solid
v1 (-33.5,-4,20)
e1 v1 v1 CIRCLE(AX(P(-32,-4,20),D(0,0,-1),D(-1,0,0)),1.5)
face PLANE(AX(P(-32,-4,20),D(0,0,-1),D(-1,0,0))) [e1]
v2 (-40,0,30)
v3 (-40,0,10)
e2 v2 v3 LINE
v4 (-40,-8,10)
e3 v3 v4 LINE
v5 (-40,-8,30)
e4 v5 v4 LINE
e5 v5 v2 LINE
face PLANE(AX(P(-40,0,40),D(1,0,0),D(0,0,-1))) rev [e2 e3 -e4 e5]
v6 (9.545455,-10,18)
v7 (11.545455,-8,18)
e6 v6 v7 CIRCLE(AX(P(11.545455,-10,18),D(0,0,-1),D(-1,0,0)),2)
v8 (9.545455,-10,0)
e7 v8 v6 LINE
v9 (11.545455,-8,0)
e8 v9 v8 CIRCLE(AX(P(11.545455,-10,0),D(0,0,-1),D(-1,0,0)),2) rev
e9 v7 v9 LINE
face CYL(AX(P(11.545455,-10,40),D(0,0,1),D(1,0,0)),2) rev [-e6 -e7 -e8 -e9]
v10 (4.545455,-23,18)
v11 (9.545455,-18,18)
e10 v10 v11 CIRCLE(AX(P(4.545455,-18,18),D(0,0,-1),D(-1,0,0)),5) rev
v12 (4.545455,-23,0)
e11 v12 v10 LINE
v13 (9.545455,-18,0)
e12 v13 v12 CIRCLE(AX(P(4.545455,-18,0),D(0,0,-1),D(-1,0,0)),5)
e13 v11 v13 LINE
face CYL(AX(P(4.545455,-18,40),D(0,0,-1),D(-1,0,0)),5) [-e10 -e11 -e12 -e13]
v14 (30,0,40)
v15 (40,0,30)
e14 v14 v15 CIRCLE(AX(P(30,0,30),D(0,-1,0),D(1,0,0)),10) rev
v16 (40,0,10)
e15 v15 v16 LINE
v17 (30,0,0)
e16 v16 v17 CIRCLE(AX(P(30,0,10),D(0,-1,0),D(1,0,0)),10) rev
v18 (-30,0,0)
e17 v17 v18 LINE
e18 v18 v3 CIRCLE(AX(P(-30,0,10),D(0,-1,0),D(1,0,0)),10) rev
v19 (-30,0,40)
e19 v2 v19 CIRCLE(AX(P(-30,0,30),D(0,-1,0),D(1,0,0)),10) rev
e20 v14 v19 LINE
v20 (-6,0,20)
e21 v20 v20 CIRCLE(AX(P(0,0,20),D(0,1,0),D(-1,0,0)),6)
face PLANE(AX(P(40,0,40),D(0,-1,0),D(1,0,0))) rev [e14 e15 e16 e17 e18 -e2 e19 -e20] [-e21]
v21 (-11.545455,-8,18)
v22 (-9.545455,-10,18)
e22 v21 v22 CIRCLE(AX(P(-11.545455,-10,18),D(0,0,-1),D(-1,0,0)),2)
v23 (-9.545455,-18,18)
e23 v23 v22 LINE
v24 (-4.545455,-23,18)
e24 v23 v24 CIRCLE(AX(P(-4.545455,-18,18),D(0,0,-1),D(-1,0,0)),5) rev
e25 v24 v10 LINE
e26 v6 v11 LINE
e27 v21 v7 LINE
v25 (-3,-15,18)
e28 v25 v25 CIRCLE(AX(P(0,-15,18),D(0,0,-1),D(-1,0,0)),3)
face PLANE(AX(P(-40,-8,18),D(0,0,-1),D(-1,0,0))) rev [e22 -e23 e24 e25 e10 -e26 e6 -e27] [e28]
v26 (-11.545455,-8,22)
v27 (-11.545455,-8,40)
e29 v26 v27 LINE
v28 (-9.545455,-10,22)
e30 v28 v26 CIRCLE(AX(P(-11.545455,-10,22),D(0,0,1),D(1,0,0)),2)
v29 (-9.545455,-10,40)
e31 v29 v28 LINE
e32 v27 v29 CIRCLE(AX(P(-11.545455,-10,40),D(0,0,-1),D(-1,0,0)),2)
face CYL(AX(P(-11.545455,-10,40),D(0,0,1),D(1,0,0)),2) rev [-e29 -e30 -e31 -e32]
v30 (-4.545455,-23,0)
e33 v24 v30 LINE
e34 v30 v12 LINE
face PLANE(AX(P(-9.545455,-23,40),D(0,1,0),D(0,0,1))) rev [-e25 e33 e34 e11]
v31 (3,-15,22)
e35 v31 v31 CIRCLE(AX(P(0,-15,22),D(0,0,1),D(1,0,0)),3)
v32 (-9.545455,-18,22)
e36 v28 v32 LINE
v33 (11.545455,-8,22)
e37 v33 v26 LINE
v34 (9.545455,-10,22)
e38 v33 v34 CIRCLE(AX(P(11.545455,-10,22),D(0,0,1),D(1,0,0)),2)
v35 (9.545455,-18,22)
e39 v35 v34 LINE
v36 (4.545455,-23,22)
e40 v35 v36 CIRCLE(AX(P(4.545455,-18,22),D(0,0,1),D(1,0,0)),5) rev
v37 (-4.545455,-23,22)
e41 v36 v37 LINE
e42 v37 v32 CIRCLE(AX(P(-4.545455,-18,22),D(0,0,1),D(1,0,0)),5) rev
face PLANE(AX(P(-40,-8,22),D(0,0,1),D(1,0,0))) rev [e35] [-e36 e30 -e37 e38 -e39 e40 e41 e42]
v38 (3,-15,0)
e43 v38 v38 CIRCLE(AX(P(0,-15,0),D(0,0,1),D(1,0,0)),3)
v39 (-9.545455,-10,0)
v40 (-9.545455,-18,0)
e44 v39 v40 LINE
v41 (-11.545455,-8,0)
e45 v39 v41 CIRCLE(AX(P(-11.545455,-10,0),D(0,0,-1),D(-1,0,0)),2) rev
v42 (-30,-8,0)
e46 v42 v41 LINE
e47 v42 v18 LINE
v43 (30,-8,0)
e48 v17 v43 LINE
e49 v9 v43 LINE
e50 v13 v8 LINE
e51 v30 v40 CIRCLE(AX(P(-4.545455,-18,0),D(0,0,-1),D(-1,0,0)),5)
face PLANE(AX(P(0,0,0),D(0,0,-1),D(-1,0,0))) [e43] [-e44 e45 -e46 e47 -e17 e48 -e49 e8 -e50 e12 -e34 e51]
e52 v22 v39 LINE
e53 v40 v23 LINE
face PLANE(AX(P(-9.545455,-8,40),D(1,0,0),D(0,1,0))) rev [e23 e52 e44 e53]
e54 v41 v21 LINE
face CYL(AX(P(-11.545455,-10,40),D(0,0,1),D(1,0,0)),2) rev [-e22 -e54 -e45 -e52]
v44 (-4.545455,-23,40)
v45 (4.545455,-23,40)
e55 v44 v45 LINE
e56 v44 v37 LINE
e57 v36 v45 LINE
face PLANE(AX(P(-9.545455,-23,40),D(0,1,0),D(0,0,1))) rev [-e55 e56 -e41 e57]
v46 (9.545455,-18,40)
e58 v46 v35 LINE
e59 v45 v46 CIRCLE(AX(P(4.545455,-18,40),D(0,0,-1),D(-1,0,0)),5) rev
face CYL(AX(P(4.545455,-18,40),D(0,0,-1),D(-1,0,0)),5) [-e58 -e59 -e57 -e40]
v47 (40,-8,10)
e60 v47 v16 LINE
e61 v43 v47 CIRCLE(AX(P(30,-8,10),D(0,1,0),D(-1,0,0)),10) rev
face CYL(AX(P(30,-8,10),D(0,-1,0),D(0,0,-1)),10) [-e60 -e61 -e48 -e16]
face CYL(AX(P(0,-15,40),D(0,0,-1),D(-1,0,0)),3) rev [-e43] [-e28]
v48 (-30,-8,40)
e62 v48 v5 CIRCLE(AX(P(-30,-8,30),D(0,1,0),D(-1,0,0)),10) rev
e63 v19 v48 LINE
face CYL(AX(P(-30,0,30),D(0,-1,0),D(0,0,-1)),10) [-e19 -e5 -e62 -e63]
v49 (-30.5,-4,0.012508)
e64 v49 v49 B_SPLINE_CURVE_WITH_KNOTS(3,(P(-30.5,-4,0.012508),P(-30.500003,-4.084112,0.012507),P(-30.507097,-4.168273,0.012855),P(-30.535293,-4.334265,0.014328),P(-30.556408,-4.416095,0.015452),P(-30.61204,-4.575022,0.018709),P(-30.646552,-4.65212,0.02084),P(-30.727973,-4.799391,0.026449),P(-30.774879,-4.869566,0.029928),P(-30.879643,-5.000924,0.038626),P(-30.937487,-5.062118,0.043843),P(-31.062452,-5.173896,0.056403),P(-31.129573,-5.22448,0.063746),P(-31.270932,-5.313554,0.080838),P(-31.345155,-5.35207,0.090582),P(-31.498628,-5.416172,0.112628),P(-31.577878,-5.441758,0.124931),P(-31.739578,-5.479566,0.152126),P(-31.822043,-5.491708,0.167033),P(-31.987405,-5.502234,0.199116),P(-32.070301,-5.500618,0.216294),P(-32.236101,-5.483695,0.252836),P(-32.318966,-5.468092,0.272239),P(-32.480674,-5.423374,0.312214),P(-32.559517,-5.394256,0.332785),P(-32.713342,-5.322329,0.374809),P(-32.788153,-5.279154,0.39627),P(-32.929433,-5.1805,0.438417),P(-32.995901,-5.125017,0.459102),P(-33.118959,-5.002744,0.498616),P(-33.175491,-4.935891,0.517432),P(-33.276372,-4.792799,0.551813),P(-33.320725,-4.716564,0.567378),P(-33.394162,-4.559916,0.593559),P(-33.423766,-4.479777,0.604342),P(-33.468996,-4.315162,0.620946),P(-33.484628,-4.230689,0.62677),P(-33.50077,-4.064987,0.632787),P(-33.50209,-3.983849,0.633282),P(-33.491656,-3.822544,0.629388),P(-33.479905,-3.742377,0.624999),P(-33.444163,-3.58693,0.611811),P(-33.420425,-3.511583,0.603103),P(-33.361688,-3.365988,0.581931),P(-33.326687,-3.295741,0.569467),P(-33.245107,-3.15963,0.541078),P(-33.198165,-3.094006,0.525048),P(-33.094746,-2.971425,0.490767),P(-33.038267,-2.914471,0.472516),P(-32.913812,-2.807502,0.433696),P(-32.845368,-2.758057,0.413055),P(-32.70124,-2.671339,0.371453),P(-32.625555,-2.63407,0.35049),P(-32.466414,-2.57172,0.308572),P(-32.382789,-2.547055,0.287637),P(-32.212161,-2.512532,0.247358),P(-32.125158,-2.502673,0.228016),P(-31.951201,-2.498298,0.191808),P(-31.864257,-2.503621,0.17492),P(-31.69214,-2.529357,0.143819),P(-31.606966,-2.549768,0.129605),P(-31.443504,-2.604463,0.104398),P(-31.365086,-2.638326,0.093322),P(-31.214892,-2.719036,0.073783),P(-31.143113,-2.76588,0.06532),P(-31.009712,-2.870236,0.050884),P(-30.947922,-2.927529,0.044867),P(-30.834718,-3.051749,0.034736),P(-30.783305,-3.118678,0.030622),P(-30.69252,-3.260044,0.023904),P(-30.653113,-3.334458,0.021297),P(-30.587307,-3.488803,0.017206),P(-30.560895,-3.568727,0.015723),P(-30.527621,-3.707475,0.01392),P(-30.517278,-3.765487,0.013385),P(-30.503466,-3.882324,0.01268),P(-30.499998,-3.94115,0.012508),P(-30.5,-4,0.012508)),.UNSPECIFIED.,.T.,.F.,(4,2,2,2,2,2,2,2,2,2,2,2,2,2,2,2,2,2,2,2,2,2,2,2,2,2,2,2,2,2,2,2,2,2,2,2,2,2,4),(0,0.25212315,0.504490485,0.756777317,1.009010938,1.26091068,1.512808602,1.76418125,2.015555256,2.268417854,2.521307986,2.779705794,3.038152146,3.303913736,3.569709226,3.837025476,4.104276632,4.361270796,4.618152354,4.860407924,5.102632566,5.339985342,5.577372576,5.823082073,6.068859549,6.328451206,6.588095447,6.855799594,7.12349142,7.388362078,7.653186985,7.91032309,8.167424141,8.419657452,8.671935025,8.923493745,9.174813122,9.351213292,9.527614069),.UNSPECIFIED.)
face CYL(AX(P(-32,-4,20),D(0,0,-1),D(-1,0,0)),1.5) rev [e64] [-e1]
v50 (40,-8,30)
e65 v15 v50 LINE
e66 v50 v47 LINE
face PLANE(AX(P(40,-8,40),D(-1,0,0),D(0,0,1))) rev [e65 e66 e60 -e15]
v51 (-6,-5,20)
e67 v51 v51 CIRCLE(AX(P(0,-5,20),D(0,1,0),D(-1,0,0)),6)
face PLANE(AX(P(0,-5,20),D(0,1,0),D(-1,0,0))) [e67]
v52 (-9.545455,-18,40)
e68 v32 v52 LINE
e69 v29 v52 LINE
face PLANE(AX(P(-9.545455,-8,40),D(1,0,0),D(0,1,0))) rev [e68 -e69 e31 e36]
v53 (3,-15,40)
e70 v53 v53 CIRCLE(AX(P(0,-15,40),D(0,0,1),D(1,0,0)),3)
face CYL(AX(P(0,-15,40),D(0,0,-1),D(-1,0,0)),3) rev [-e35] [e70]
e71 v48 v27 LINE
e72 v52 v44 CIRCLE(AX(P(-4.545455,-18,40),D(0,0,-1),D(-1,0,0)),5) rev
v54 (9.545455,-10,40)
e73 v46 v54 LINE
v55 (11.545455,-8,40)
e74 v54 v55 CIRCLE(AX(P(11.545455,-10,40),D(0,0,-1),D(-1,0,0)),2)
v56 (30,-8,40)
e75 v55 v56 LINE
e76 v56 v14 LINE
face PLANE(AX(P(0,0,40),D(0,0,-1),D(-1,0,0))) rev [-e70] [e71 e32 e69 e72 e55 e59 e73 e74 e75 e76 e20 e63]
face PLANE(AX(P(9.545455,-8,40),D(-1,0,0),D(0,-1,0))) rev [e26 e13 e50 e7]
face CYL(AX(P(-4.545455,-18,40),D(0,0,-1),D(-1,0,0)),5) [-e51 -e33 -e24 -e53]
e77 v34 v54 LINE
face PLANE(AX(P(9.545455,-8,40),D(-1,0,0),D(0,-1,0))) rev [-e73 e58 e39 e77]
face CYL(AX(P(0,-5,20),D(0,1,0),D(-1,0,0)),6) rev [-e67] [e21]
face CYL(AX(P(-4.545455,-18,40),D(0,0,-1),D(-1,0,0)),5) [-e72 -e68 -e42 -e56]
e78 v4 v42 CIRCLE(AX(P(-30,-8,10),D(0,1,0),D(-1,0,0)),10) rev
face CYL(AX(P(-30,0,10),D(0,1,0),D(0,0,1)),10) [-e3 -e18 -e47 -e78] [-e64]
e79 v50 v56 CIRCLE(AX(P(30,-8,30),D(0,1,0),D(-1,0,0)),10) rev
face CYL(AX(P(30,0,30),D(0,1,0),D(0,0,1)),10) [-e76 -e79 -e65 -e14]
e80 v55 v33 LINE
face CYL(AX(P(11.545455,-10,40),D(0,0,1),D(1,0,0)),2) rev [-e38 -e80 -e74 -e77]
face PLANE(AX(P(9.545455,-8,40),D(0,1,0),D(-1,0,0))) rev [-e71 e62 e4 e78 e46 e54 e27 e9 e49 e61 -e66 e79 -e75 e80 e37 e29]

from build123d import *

# Parameters (mm, degrees)
SKETCH1_R           = 3
BOSS_EXTRUDE1_DEPTH = 40
SKETCH2_R           = 1.5
CUT_EXTRUDE1_DEPTH  = 20
SKETCH6_W           = 80
SKETCH6_H           = 4
CUT_EXTRUDE4_DEPTH  = 15
FILLET1_R           = 10
FILLET2_R           = 5
FILLET3_R           = 2
SKETCH7_R           = 6
CUT_EXTRUDE5_DEPTH  = 5


with BuildPart() as part:
    # Sketch1 → Boss-Extrude1 (new body)
    with BuildSketch(Plane.XY):
        Polygon((40, 0), (-40, 0), (-40, -8), (-9.545454545, -8), (-9.545454545, -23), (9.545454545, -23), (9.545454545, -8), (40, -8), align=None)
        with Locations((0, -15)):
            Circle(SKETCH1_R, mode=Mode.SUBTRACT)
    extrude(amount=BOSS_EXTRUDE1_DEPTH)

    # Sketch2 → Cut-Extrude1 (cut)
    with BuildSketch(Plane(origin=(0, 0, 0), x_dir=(-1, 0, 0), z_dir=(0, 0, -1))):
        with Locations((32, -4)):
            Circle(SKETCH2_R)
    extrude(amount=-CUT_EXTRUDE1_DEPTH, mode=Mode.SUBTRACT)

    # Sketch6 → Cut-Extrude4 (cut)
    with BuildSketch(Plane.XZ.offset(23)):
        with Locations((0, 20)):
            Rectangle(SKETCH6_W, SKETCH6_H)
    extrude(amount=-CUT_EXTRUDE4_DEPTH, mode=Mode.SUBTRACT)

    # Fillet1
    # the kernel refuses this fillet: 10 mm, written as the material it takes off along each edge
    with BuildSketch(Plane(origin=(40, -33, 40), x_dir=(-1, 0, 0), z_dir=(0, 1, 0)), Plane(origin=(-40, 25, 40), x_dir=(1, 0, 0), z_dir=(0, -1, 0))) as fillet1_piece_1:
        with BuildLine():
            CenterArc((FILLET1_R, -FILLET1_R), FILLET1_R, 90, 90)
            Line((0, -FILLET1_R), (0, 0))
            Line((0, 0), (FILLET1_R, 0))
        make_face()
    extrude(amount=58, mode=Mode.SUBTRACT)
    with BuildSketch(Plane(origin=(-40, 25, 0), x_dir=(1, 0, 0), z_dir=(0, -1, 0)), Plane(origin=(40, -33, 0), x_dir=(-1, 0, 0), z_dir=(0, 1, 0))) as fillet1_piece_2:
        with BuildLine():
            CenterArc((FILLET1_R, FILLET1_R), FILLET1_R, 180, 90)
            Line((0, FILLET1_R), (0, 0))
            Line((0, 0), (FILLET1_R, 0))
        make_face()
    extrude(amount=58, mode=Mode.SUBTRACT)

    # Fillet2
    fillet2_edges = [part.edges().sort_by_distance(p)[0] for p in [
        (9.545454545, -23, 31),
        (-9.545454545, -23, 31),
        (9.545454545, -23, 9),
        (-9.545454545, -23, 9),
    ]]
    fillet(fillet2_edges, radius=FILLET2_R)

    # Fillet3
    fillet3_edges = [part.edges().sort_by_distance(p)[0] for p in [
        (9.545454545, -8, 31),
        (-9.545454545, -8, 31),
        (9.545454545, -8, 9),
        (-9.545454545, -8, 9),
    ]]
    fillet(fillet3_edges, radius=FILLET3_R)

    # Sketch7 → Cut-Extrude5 (cut)
    with BuildSketch(Plane(origin=(0, 0, 0), x_dir=(1, 0, 0), z_dir=(0, 1, 0))):
        with Locations(Location((0, -20, 0), (0, 0, 180))):
            Circle(SKETCH7_R)
    extrude(amount=-CUT_EXTRUDE5_DEPTH, mode=Mode.SUBTRACT)


solid = part.part
